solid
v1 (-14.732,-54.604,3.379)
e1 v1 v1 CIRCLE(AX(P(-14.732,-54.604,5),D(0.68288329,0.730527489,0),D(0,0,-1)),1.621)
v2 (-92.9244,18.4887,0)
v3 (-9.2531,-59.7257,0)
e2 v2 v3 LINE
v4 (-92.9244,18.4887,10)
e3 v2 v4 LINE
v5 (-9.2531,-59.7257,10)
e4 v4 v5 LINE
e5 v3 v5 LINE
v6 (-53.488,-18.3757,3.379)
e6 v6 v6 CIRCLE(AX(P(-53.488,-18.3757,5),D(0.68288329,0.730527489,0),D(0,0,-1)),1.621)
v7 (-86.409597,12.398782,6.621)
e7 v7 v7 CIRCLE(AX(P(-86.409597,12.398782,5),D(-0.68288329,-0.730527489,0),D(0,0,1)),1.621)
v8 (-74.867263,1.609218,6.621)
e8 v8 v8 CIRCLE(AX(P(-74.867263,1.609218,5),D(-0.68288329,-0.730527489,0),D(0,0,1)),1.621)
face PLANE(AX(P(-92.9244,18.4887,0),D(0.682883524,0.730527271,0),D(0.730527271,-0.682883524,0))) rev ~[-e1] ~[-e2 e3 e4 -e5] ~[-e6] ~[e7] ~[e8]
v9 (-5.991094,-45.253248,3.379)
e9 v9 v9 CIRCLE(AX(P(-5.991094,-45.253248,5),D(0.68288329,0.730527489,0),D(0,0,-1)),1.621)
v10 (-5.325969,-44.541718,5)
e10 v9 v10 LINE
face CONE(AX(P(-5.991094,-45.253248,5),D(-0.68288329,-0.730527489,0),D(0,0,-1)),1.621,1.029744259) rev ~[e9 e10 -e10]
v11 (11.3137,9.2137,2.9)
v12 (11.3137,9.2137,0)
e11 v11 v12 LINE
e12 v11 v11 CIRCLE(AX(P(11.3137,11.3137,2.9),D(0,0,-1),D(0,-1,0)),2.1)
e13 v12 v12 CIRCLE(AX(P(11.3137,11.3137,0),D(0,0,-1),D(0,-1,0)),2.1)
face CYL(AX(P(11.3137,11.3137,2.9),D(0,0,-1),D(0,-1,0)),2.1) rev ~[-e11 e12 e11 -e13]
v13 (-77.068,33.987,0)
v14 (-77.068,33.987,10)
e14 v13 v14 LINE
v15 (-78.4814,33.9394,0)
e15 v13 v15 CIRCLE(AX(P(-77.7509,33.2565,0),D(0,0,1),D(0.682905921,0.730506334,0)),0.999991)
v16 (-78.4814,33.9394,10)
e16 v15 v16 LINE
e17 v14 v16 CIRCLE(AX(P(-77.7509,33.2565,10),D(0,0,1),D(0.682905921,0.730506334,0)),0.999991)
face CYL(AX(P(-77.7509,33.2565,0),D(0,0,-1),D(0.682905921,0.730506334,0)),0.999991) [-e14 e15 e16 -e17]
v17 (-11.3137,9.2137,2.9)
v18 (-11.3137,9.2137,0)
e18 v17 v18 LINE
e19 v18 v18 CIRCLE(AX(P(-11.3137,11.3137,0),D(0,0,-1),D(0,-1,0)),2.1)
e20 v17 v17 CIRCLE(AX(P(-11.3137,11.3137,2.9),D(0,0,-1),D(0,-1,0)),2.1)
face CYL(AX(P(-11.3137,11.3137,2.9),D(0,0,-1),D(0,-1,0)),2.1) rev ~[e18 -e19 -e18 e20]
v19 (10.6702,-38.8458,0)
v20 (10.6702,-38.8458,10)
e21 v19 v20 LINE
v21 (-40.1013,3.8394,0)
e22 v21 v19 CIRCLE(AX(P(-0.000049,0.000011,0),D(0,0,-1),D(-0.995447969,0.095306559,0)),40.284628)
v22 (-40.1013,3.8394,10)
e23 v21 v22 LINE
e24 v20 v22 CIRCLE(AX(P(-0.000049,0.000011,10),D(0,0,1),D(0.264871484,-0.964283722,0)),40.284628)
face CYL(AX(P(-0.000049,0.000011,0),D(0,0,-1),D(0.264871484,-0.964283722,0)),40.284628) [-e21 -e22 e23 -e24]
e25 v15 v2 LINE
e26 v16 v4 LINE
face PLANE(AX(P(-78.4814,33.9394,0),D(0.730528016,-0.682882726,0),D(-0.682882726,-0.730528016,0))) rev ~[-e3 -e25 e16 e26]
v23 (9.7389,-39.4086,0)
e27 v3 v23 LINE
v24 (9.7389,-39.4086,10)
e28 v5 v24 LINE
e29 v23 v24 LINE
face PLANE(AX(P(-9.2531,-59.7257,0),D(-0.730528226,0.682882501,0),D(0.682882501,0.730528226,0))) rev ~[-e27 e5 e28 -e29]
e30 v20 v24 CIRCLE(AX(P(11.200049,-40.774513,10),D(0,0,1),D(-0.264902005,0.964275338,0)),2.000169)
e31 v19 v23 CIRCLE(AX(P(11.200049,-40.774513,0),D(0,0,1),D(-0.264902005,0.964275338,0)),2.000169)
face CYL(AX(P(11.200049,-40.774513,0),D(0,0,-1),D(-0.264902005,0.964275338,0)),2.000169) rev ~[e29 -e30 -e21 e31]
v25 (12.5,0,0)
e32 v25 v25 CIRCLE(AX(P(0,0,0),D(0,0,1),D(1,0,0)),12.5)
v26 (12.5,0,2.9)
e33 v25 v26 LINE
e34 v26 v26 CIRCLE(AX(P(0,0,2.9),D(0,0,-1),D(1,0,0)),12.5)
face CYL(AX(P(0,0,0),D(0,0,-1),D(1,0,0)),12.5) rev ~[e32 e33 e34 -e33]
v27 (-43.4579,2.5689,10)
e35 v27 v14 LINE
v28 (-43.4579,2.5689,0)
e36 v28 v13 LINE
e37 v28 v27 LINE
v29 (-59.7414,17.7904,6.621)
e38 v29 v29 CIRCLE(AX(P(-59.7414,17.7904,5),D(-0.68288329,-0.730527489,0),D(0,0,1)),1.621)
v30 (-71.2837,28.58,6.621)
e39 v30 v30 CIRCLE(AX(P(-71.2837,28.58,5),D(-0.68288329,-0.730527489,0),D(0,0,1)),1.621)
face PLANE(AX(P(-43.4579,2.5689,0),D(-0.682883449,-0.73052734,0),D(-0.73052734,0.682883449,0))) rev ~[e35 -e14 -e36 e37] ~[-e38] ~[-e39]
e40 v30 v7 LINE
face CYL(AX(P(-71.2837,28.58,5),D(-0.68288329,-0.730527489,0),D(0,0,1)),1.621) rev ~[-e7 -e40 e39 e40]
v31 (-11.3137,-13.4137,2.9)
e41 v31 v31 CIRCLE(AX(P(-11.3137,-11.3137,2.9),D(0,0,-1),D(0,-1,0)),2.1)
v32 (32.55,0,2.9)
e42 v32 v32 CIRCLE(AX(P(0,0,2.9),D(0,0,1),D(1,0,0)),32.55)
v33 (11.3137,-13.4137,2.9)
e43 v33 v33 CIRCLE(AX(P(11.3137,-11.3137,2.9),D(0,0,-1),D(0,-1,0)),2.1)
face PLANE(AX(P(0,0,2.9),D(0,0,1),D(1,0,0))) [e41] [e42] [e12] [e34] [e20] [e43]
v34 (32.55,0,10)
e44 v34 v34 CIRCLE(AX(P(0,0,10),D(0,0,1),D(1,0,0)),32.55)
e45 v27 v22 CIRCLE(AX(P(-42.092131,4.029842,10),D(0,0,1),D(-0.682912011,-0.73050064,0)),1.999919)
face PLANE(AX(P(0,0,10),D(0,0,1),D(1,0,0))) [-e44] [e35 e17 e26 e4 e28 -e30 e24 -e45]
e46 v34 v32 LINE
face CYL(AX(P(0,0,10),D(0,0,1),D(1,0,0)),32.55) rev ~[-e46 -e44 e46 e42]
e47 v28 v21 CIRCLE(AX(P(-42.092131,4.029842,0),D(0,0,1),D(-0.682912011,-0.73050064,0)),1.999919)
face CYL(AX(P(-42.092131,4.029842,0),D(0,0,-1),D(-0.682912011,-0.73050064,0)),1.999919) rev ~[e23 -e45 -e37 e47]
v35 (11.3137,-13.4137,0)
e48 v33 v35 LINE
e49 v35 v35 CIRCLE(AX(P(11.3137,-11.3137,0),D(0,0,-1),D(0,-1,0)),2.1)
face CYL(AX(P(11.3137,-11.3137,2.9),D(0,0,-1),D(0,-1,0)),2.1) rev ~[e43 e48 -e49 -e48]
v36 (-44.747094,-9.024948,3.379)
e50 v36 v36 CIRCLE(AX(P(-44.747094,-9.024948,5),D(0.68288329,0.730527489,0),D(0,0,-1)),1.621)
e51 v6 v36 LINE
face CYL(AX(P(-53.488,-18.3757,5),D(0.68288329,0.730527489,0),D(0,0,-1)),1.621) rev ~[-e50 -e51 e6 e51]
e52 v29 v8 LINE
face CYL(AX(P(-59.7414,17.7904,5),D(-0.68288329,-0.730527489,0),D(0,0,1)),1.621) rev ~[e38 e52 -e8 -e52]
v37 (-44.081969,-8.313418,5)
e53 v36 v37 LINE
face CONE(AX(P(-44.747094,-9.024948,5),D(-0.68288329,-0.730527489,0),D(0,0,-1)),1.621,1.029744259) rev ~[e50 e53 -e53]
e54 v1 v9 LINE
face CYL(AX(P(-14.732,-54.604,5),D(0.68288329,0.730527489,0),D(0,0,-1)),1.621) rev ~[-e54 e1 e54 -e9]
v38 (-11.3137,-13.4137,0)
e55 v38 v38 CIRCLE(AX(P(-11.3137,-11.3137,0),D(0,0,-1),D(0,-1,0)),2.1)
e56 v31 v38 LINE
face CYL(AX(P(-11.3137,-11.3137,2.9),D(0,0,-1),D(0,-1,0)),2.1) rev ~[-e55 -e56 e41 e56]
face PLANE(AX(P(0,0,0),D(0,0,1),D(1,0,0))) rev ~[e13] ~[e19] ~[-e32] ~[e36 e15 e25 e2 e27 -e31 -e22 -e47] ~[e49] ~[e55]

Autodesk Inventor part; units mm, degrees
ref_plane "YZ Plane" through (0, 0, 0) normal (1, 0, 0) x (0, 1, 0)
ref_plane "XZ Plane" through (0, 0, 0) normal (0, 1, 0) x (-1, 0, 0)
ref_plane "Work Plane1" through (0, 0, 0) normal (0, 0, 1) x (1, 0, 0)
sketch "Sketch1" plane through (0, 0, 0) normal (0, 0, 1) x (1, 0, 0)
  arc A0 (-77.068, 33.987) -> (-78.4814, 33.9394) centre (-77.7509, 33.2565) ccw projected
  line L0 (-78.4814, 33.9394) -> (-92.9244, 18.4887) projected
  line L1 (-92.9244, 18.4887) -> (-9.2531, -59.7257) projected
  line L2 (-9.2531, -59.7257) -> (9.7389, -39.4086) projected
  arc A1 (10.6702, -38.8458) -> (9.7389, -39.4086) centre (11.2, -40.7744) ccw projected
  arc A2 (10.6702, -38.8458) -> (-40.1013, 3.8394) centre (0, 0) ccw projected
  line L3 (-43.4579, 2.5689) -> (-77.068, 33.987) projected
  circle A3 centre (33.3141, 1.123) radius 2.5 projected
  circle A4 centre (1.123, -33.3141) radius 2.5 projected
  circle A5 centre (0, 0) radius 21 projected
  circle A6 centre (-1.123, 33.3141) radius 2.5 projected
  circle A7 centre (-33.3141, -1.123) radius 2.5 projected
  circle A8 centre (0, 0) radius 12.5 projected
  circle A9 centre (0, -16) radius 2 projected
  circle A10 centre (0, 16) radius 2 projected
  circle A11 centre (-16, 0) radius 2 projected
  circle A12 centre (16, 0) radius 2 projected
  circle A13 centre (11.3137, 11.3137) radius 1.6 projected
  circle A14 centre (-11.3137, -11.3137) radius 1.6 projected
  circle A15 centre (-11.3137, 11.3137) radius 1.6 projected
  circle A16 centre (11.3137, -11.3137) radius 1.6 projected
  circle A17 centre (0, 0) radius 20.7 projected
  circle A18 centre (0, 0) radius 40.2846
  line L4 (31.6375, -97.9493) -> (-99.8575, 24.9697) projected
  arc A19 (-43.4579, 2.5689) -> (-40.1013, 3.8394) centre (-42.0921, 4.03) ccw projected
  point P0 (0, 0)
  point P1 (-45.0314, -26.2807)
  point P2 (-23.1886, -46.699)
  point P3 (0, 0)
  point P4 (10.6702, -38.8458)
  point P5 (-40.1013, 3.8394)
  point P6 (0, 0)
extrude "Extrusion1" add sketch "Sketch1" along normal blind 10 contours L3 A19 A18 A1 L2 L1 L0 A0 | A2 A18 | A3 | A4 | A5 | A6 | A7 | A9 | A10 | A11 | A12 | A13 | A14 | A15 | A16 | A17
sketch "Sketch2" plane through (-77.068, 33.987, 10) normal (0.6828833, 0.7305275, 0) x (0.7305275, -0.6828833, 0)
  arc A0 (36.818, 70.5) -> (34.818, 72.5) centre (34.818, 70.5) ccw projected
  line L0 (-3.182, 72.5) -> (34.818, 72.5) projected
  arc A1 (-3.182, 72.5) -> (-5.182, 70.5) centre (-3.182, 70.5) ccw projected
  line L1 (-5.182, 2) -> (-5.182, 70.5) projected
  arc A2 (-5.182, 2) -> (-3.182, 0) centre (-3.182, 2) ccw projected
  line L2 (34.818, 0) -> (-3.182, 0) projected
  arc A3 (34.818, 0) -> (36.818, 2) centre (34.818, 2) ccw projected
  line L3 (36.818, 70.5) -> (36.818, 2) projected
  circle A4 centre (15.818, 36.25) radius 12.6 projected
  circle A5 centre (31.818, 36.25) radius 2 projected
  arc A6 (31.218, 2.9) -> (31.218, 7.1) centre (31.218, 5) ccw projected
  line L4 (0.418, 2.9) -> (31.218, 2.9) projected
  arc A7 (0.418, 7.1) -> (0.418, 2.9) centre (0.418, 5) ccw projected
  line L5 (31.218, 7.1) -> (0.418, 7.1) projected
  circle A8 centre (15.818, 20.25) radius 2 projected
  arc A9 (0.418, 69.6) -> (0.418, 65.4) centre (0.418, 67.5) ccw projected
  line L6 (31.218, 69.6) -> (0.418, 69.6) projected
  arc A10 (31.218, 65.4) -> (31.218, 69.6) centre (31.218, 67.5) ccw projected
  line L7 (0.418, 65.4) -> (31.218, 65.4) projected
  circle A11 centre (15.818, 52.25) radius 2 projected
  circle A12 centre (-0.182, 36.25) radius 2 projected
  circle A13 centre (7.918, 67.5) radius 1.5706 projected
  circle A14 centre (23.718, 67.5) radius 1.5706 projected
  circle A15 centre (28.5459, 23.5221) radius 2 projected
  circle A16 centre (3.09, 23.5221) radius 2 projected
  circle A17 centre (3.09, 48.9779) radius 2 projected
  circle A18 centre (28.5459, 48.9779) radius 2 projected
  point P0 (79.5095, 10)
  point P1 (7.918, 5)
  point P2 (23.718, 5)
hole "Hole1" at (-71.2837, 28.58, 5) at (-59.7414, 17.7904, 5) direction (-0.6828833, -0.7305275, 0) diameter 3.242 end through all thread size "M4x0.7" class "6H" standard "ISO Metric profile"
sketch "Sketch9" plane through (0, 0, 10) normal (0, 0, 1) x (1, 0, 0)
  circle A0 centre (0, 0) radius 32.55
  dimension "d44" = 65.1
extrude "Extrusion4" cut sketch "Sketch9" against normal blind 7.1
sketch "Sketch11" plane through (-9.2531, -59.7257, 0) normal (-0.6828833, -0.7305275, 0) x (0.7305275, -0.6828833, 0)
  circle A0 centre (-60.5521, 5) radius 2.25 projected
  circle A1 centre (-7.5, 5) radius 2.25 projected
  point P0 (-34.026, 0)
hole "Hole7" at (-53.488, -18.3757, 5) at (-14.732, -54.604, 5) direction (0.6828833, 0.7305275, 0) diameter 3.242 depth 12.8 tip angle 118 thread size "M4x0.7" class "6H" standard "ISO Metric profile"
sketch "Sketch12" plane through (0, 0, 2.9) normal (0, 0, 1) x (1, 0, 0)
  circle A0 centre (0, 0) radius 12.5 projected
  circle A1 centre (0, -18) radius 2 projected
  circle A2 centre (0, 18) radius 2 projected
  circle A3 centre (-18, 0) radius 2 projected
  circle A4 centre (18, 0) radius 2 projected
  circle A5 centre (11.3137, 11.3137) radius 1.6 projected
  circle A6 centre (-11.3137, -11.3137) radius 1.6 projected
  circle A7 centre (-11.3137, 11.3137) radius 1.6 projected
  circle A8 centre (11.3137, -11.3137) radius 1.6 projected
  circle A9 centre (0, 0) radius 20.7 projected
  point P0 (0, 0)
hole "Hole8" at (11.3137, 11.3137, 2.9) at (-11.3137, 11.3137, 2.9) at (-11.3137, -11.3137, 2.9) at (11.3137, -11.3137, 2.9) direction (0, 0, -1) diameter 4.2 depth 12.8 tip angle 118 clearance for "Countersunk Flat Head Screw ISO 2009/7046" size "M4" standard "ISO"
properties part number "base frame voorkant 10 mm" material "Aluminum 6061"
